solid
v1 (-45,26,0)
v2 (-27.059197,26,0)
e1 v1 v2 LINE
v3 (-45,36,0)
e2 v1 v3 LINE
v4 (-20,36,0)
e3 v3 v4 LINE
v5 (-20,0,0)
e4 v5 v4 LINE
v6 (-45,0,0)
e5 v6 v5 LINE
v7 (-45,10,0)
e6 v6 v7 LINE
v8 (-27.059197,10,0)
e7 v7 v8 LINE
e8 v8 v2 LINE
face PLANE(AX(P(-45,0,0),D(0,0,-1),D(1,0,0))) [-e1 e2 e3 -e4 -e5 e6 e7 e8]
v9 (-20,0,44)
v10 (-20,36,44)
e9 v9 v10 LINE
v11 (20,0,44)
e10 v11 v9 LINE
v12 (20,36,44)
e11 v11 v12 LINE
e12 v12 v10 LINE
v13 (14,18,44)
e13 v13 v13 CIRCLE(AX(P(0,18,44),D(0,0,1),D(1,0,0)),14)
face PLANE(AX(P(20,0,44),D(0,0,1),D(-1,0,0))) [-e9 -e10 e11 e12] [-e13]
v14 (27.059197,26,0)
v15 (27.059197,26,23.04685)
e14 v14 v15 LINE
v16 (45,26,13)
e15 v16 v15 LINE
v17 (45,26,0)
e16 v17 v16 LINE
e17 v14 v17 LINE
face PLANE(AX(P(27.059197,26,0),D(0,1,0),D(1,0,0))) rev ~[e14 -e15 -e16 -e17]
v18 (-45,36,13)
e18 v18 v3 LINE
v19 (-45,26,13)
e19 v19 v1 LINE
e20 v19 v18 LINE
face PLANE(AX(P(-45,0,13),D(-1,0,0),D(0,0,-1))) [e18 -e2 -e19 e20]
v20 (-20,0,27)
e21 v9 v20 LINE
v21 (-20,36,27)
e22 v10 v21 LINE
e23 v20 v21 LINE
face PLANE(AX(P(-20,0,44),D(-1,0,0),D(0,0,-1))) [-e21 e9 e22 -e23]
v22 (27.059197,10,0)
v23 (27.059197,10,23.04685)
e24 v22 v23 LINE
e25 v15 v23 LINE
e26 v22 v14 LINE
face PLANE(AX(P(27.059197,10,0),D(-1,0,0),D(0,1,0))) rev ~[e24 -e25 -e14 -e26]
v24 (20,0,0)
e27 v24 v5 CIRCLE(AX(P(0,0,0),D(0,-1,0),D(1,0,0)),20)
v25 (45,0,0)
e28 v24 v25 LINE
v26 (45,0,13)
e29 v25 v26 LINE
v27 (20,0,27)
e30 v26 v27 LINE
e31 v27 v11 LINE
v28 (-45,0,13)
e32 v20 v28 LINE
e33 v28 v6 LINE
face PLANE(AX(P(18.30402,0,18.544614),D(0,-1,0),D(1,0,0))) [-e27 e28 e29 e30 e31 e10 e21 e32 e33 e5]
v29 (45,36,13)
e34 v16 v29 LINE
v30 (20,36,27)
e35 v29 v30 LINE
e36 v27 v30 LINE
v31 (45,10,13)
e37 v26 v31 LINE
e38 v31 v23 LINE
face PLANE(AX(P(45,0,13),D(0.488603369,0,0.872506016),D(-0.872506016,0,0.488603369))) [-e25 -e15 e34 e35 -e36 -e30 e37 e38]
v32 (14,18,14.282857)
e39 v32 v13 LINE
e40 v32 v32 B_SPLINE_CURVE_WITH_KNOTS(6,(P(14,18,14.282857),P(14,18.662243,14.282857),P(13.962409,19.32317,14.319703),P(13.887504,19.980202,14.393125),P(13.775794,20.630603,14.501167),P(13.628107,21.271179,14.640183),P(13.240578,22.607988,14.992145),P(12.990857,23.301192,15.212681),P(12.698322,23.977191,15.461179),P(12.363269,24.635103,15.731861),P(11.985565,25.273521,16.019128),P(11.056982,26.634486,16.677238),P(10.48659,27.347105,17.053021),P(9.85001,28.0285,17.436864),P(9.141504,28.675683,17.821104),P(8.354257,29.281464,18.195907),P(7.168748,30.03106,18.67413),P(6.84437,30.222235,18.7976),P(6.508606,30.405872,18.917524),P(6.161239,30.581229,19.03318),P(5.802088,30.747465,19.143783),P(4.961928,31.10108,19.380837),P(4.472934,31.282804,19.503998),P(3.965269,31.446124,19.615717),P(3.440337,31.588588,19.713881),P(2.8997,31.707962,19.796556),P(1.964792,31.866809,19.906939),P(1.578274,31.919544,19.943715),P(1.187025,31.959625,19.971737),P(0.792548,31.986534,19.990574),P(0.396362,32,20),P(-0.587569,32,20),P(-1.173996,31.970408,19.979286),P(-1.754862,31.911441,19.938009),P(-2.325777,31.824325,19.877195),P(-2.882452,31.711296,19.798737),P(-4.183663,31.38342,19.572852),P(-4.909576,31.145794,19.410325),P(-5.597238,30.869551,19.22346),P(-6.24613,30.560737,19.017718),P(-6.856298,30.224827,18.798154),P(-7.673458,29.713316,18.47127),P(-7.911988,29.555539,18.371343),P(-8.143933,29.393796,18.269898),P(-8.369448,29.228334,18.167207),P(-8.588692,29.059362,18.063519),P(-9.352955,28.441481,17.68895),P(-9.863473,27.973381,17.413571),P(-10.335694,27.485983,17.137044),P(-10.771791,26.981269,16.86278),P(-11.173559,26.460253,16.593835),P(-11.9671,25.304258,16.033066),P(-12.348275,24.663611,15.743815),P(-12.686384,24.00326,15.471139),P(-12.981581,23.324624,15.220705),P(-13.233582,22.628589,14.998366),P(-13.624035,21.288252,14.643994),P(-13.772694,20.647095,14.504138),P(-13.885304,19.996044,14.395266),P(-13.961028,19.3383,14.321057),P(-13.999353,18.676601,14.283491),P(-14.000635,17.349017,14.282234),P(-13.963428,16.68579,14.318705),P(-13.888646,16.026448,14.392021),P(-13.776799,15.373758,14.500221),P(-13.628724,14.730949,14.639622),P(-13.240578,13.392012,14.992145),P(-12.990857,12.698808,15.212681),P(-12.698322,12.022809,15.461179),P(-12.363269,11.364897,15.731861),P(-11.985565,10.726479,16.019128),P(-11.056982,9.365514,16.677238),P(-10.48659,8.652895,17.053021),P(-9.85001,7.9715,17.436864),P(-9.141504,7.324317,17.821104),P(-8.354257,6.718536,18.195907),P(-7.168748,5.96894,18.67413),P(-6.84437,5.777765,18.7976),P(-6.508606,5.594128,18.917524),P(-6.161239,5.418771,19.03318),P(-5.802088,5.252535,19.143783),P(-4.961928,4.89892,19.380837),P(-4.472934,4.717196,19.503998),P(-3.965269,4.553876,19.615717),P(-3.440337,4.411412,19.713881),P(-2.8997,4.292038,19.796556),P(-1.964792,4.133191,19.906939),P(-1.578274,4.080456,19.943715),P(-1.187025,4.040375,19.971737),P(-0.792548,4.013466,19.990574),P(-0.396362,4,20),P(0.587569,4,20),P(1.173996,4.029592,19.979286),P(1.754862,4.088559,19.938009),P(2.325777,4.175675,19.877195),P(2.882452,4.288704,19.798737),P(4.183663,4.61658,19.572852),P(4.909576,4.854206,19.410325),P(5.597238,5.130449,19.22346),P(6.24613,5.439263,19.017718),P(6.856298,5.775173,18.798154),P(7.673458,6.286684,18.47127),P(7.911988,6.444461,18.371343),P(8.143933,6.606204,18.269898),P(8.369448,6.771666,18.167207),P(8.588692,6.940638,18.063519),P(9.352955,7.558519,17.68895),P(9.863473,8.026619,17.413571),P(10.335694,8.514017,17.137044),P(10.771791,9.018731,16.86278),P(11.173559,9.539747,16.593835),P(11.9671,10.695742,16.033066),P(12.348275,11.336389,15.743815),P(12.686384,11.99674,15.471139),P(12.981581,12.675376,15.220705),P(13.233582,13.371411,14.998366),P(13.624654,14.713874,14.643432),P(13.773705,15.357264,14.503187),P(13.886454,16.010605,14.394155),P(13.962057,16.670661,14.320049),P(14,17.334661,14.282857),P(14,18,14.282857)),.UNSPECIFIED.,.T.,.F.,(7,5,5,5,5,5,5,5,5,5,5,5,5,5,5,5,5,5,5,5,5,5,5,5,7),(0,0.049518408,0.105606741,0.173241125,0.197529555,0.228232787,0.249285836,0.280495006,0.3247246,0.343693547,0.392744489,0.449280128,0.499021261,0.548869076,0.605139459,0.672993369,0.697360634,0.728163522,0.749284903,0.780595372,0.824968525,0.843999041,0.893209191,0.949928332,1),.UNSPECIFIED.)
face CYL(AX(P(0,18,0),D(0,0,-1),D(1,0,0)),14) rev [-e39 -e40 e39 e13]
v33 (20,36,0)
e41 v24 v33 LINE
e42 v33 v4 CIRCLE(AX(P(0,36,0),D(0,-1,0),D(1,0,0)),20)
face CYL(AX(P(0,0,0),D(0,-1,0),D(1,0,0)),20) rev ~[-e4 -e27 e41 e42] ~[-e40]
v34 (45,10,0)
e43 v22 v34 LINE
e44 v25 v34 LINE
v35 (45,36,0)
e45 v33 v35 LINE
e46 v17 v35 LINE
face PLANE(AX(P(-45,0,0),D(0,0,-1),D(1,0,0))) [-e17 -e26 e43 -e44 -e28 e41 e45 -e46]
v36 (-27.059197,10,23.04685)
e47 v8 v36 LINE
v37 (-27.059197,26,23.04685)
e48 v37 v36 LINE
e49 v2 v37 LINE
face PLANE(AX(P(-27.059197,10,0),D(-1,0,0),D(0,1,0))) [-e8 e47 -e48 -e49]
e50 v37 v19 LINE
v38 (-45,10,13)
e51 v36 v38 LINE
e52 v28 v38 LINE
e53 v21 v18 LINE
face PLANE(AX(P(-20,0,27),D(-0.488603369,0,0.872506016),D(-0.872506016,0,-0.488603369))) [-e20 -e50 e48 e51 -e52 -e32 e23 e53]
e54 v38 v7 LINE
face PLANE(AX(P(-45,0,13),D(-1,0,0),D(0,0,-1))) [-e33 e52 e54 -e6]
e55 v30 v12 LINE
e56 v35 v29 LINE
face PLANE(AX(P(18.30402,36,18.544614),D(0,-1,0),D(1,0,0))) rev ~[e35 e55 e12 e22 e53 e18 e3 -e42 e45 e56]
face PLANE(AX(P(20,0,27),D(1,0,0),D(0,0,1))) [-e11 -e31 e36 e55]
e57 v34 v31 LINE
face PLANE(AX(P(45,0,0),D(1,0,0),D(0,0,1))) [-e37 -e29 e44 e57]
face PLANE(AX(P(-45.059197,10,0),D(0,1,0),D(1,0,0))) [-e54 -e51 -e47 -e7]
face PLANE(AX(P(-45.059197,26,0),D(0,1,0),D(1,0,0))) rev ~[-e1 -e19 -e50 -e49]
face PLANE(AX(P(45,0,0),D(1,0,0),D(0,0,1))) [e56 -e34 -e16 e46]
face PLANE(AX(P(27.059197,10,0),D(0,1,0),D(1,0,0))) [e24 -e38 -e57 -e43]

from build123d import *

# Parameters (mm, degrees)
F1_DEPTH = 36
F3_DEPTH = 36
F4_R     = 14
F4_W     = 18
F4_H     = 16
F5_DEPTH = 44


with BuildPart() as f1:
    # F0 (on Front) → F1 (new body)
    with BuildSketch(Plane.XZ):
        Polygon((0, 44), (0, 0), (45, 0), (45, 13), (20, 27), (20, 44), align=None)
        Polygon((-45, 0), (0, 0), (0, 44), (-20, 44), (-20, 27), (-45, 13), align=None)
    extrude(amount=-F1_DEPTH)

    # F2 (on face) → F3 (cut)
    with BuildSketch(Plane.XZ):
        with BuildLine():
            Line((-20, 0), (20, 0))
            ThreePointArc((20, 0), (0, 20), (-20, 0))
        make_face()
    extrude(amount=-F3_DEPTH, mode=Mode.SUBTRACT)

    # F4 (on Top) → F5 (cut)
    with BuildSketch(Plane.XY):
        with Locations((0, 18)):
            Circle(F4_R)
        with Locations((-36.059196651, 18)):
            Rectangle(F4_W, F4_H)
        with Locations((36.059196651, 18)):
            Rectangle(F4_W, F4_H)
    extrude(amount=F5_DEPTH, mode=Mode.SUBTRACT)


solid = f1.part
